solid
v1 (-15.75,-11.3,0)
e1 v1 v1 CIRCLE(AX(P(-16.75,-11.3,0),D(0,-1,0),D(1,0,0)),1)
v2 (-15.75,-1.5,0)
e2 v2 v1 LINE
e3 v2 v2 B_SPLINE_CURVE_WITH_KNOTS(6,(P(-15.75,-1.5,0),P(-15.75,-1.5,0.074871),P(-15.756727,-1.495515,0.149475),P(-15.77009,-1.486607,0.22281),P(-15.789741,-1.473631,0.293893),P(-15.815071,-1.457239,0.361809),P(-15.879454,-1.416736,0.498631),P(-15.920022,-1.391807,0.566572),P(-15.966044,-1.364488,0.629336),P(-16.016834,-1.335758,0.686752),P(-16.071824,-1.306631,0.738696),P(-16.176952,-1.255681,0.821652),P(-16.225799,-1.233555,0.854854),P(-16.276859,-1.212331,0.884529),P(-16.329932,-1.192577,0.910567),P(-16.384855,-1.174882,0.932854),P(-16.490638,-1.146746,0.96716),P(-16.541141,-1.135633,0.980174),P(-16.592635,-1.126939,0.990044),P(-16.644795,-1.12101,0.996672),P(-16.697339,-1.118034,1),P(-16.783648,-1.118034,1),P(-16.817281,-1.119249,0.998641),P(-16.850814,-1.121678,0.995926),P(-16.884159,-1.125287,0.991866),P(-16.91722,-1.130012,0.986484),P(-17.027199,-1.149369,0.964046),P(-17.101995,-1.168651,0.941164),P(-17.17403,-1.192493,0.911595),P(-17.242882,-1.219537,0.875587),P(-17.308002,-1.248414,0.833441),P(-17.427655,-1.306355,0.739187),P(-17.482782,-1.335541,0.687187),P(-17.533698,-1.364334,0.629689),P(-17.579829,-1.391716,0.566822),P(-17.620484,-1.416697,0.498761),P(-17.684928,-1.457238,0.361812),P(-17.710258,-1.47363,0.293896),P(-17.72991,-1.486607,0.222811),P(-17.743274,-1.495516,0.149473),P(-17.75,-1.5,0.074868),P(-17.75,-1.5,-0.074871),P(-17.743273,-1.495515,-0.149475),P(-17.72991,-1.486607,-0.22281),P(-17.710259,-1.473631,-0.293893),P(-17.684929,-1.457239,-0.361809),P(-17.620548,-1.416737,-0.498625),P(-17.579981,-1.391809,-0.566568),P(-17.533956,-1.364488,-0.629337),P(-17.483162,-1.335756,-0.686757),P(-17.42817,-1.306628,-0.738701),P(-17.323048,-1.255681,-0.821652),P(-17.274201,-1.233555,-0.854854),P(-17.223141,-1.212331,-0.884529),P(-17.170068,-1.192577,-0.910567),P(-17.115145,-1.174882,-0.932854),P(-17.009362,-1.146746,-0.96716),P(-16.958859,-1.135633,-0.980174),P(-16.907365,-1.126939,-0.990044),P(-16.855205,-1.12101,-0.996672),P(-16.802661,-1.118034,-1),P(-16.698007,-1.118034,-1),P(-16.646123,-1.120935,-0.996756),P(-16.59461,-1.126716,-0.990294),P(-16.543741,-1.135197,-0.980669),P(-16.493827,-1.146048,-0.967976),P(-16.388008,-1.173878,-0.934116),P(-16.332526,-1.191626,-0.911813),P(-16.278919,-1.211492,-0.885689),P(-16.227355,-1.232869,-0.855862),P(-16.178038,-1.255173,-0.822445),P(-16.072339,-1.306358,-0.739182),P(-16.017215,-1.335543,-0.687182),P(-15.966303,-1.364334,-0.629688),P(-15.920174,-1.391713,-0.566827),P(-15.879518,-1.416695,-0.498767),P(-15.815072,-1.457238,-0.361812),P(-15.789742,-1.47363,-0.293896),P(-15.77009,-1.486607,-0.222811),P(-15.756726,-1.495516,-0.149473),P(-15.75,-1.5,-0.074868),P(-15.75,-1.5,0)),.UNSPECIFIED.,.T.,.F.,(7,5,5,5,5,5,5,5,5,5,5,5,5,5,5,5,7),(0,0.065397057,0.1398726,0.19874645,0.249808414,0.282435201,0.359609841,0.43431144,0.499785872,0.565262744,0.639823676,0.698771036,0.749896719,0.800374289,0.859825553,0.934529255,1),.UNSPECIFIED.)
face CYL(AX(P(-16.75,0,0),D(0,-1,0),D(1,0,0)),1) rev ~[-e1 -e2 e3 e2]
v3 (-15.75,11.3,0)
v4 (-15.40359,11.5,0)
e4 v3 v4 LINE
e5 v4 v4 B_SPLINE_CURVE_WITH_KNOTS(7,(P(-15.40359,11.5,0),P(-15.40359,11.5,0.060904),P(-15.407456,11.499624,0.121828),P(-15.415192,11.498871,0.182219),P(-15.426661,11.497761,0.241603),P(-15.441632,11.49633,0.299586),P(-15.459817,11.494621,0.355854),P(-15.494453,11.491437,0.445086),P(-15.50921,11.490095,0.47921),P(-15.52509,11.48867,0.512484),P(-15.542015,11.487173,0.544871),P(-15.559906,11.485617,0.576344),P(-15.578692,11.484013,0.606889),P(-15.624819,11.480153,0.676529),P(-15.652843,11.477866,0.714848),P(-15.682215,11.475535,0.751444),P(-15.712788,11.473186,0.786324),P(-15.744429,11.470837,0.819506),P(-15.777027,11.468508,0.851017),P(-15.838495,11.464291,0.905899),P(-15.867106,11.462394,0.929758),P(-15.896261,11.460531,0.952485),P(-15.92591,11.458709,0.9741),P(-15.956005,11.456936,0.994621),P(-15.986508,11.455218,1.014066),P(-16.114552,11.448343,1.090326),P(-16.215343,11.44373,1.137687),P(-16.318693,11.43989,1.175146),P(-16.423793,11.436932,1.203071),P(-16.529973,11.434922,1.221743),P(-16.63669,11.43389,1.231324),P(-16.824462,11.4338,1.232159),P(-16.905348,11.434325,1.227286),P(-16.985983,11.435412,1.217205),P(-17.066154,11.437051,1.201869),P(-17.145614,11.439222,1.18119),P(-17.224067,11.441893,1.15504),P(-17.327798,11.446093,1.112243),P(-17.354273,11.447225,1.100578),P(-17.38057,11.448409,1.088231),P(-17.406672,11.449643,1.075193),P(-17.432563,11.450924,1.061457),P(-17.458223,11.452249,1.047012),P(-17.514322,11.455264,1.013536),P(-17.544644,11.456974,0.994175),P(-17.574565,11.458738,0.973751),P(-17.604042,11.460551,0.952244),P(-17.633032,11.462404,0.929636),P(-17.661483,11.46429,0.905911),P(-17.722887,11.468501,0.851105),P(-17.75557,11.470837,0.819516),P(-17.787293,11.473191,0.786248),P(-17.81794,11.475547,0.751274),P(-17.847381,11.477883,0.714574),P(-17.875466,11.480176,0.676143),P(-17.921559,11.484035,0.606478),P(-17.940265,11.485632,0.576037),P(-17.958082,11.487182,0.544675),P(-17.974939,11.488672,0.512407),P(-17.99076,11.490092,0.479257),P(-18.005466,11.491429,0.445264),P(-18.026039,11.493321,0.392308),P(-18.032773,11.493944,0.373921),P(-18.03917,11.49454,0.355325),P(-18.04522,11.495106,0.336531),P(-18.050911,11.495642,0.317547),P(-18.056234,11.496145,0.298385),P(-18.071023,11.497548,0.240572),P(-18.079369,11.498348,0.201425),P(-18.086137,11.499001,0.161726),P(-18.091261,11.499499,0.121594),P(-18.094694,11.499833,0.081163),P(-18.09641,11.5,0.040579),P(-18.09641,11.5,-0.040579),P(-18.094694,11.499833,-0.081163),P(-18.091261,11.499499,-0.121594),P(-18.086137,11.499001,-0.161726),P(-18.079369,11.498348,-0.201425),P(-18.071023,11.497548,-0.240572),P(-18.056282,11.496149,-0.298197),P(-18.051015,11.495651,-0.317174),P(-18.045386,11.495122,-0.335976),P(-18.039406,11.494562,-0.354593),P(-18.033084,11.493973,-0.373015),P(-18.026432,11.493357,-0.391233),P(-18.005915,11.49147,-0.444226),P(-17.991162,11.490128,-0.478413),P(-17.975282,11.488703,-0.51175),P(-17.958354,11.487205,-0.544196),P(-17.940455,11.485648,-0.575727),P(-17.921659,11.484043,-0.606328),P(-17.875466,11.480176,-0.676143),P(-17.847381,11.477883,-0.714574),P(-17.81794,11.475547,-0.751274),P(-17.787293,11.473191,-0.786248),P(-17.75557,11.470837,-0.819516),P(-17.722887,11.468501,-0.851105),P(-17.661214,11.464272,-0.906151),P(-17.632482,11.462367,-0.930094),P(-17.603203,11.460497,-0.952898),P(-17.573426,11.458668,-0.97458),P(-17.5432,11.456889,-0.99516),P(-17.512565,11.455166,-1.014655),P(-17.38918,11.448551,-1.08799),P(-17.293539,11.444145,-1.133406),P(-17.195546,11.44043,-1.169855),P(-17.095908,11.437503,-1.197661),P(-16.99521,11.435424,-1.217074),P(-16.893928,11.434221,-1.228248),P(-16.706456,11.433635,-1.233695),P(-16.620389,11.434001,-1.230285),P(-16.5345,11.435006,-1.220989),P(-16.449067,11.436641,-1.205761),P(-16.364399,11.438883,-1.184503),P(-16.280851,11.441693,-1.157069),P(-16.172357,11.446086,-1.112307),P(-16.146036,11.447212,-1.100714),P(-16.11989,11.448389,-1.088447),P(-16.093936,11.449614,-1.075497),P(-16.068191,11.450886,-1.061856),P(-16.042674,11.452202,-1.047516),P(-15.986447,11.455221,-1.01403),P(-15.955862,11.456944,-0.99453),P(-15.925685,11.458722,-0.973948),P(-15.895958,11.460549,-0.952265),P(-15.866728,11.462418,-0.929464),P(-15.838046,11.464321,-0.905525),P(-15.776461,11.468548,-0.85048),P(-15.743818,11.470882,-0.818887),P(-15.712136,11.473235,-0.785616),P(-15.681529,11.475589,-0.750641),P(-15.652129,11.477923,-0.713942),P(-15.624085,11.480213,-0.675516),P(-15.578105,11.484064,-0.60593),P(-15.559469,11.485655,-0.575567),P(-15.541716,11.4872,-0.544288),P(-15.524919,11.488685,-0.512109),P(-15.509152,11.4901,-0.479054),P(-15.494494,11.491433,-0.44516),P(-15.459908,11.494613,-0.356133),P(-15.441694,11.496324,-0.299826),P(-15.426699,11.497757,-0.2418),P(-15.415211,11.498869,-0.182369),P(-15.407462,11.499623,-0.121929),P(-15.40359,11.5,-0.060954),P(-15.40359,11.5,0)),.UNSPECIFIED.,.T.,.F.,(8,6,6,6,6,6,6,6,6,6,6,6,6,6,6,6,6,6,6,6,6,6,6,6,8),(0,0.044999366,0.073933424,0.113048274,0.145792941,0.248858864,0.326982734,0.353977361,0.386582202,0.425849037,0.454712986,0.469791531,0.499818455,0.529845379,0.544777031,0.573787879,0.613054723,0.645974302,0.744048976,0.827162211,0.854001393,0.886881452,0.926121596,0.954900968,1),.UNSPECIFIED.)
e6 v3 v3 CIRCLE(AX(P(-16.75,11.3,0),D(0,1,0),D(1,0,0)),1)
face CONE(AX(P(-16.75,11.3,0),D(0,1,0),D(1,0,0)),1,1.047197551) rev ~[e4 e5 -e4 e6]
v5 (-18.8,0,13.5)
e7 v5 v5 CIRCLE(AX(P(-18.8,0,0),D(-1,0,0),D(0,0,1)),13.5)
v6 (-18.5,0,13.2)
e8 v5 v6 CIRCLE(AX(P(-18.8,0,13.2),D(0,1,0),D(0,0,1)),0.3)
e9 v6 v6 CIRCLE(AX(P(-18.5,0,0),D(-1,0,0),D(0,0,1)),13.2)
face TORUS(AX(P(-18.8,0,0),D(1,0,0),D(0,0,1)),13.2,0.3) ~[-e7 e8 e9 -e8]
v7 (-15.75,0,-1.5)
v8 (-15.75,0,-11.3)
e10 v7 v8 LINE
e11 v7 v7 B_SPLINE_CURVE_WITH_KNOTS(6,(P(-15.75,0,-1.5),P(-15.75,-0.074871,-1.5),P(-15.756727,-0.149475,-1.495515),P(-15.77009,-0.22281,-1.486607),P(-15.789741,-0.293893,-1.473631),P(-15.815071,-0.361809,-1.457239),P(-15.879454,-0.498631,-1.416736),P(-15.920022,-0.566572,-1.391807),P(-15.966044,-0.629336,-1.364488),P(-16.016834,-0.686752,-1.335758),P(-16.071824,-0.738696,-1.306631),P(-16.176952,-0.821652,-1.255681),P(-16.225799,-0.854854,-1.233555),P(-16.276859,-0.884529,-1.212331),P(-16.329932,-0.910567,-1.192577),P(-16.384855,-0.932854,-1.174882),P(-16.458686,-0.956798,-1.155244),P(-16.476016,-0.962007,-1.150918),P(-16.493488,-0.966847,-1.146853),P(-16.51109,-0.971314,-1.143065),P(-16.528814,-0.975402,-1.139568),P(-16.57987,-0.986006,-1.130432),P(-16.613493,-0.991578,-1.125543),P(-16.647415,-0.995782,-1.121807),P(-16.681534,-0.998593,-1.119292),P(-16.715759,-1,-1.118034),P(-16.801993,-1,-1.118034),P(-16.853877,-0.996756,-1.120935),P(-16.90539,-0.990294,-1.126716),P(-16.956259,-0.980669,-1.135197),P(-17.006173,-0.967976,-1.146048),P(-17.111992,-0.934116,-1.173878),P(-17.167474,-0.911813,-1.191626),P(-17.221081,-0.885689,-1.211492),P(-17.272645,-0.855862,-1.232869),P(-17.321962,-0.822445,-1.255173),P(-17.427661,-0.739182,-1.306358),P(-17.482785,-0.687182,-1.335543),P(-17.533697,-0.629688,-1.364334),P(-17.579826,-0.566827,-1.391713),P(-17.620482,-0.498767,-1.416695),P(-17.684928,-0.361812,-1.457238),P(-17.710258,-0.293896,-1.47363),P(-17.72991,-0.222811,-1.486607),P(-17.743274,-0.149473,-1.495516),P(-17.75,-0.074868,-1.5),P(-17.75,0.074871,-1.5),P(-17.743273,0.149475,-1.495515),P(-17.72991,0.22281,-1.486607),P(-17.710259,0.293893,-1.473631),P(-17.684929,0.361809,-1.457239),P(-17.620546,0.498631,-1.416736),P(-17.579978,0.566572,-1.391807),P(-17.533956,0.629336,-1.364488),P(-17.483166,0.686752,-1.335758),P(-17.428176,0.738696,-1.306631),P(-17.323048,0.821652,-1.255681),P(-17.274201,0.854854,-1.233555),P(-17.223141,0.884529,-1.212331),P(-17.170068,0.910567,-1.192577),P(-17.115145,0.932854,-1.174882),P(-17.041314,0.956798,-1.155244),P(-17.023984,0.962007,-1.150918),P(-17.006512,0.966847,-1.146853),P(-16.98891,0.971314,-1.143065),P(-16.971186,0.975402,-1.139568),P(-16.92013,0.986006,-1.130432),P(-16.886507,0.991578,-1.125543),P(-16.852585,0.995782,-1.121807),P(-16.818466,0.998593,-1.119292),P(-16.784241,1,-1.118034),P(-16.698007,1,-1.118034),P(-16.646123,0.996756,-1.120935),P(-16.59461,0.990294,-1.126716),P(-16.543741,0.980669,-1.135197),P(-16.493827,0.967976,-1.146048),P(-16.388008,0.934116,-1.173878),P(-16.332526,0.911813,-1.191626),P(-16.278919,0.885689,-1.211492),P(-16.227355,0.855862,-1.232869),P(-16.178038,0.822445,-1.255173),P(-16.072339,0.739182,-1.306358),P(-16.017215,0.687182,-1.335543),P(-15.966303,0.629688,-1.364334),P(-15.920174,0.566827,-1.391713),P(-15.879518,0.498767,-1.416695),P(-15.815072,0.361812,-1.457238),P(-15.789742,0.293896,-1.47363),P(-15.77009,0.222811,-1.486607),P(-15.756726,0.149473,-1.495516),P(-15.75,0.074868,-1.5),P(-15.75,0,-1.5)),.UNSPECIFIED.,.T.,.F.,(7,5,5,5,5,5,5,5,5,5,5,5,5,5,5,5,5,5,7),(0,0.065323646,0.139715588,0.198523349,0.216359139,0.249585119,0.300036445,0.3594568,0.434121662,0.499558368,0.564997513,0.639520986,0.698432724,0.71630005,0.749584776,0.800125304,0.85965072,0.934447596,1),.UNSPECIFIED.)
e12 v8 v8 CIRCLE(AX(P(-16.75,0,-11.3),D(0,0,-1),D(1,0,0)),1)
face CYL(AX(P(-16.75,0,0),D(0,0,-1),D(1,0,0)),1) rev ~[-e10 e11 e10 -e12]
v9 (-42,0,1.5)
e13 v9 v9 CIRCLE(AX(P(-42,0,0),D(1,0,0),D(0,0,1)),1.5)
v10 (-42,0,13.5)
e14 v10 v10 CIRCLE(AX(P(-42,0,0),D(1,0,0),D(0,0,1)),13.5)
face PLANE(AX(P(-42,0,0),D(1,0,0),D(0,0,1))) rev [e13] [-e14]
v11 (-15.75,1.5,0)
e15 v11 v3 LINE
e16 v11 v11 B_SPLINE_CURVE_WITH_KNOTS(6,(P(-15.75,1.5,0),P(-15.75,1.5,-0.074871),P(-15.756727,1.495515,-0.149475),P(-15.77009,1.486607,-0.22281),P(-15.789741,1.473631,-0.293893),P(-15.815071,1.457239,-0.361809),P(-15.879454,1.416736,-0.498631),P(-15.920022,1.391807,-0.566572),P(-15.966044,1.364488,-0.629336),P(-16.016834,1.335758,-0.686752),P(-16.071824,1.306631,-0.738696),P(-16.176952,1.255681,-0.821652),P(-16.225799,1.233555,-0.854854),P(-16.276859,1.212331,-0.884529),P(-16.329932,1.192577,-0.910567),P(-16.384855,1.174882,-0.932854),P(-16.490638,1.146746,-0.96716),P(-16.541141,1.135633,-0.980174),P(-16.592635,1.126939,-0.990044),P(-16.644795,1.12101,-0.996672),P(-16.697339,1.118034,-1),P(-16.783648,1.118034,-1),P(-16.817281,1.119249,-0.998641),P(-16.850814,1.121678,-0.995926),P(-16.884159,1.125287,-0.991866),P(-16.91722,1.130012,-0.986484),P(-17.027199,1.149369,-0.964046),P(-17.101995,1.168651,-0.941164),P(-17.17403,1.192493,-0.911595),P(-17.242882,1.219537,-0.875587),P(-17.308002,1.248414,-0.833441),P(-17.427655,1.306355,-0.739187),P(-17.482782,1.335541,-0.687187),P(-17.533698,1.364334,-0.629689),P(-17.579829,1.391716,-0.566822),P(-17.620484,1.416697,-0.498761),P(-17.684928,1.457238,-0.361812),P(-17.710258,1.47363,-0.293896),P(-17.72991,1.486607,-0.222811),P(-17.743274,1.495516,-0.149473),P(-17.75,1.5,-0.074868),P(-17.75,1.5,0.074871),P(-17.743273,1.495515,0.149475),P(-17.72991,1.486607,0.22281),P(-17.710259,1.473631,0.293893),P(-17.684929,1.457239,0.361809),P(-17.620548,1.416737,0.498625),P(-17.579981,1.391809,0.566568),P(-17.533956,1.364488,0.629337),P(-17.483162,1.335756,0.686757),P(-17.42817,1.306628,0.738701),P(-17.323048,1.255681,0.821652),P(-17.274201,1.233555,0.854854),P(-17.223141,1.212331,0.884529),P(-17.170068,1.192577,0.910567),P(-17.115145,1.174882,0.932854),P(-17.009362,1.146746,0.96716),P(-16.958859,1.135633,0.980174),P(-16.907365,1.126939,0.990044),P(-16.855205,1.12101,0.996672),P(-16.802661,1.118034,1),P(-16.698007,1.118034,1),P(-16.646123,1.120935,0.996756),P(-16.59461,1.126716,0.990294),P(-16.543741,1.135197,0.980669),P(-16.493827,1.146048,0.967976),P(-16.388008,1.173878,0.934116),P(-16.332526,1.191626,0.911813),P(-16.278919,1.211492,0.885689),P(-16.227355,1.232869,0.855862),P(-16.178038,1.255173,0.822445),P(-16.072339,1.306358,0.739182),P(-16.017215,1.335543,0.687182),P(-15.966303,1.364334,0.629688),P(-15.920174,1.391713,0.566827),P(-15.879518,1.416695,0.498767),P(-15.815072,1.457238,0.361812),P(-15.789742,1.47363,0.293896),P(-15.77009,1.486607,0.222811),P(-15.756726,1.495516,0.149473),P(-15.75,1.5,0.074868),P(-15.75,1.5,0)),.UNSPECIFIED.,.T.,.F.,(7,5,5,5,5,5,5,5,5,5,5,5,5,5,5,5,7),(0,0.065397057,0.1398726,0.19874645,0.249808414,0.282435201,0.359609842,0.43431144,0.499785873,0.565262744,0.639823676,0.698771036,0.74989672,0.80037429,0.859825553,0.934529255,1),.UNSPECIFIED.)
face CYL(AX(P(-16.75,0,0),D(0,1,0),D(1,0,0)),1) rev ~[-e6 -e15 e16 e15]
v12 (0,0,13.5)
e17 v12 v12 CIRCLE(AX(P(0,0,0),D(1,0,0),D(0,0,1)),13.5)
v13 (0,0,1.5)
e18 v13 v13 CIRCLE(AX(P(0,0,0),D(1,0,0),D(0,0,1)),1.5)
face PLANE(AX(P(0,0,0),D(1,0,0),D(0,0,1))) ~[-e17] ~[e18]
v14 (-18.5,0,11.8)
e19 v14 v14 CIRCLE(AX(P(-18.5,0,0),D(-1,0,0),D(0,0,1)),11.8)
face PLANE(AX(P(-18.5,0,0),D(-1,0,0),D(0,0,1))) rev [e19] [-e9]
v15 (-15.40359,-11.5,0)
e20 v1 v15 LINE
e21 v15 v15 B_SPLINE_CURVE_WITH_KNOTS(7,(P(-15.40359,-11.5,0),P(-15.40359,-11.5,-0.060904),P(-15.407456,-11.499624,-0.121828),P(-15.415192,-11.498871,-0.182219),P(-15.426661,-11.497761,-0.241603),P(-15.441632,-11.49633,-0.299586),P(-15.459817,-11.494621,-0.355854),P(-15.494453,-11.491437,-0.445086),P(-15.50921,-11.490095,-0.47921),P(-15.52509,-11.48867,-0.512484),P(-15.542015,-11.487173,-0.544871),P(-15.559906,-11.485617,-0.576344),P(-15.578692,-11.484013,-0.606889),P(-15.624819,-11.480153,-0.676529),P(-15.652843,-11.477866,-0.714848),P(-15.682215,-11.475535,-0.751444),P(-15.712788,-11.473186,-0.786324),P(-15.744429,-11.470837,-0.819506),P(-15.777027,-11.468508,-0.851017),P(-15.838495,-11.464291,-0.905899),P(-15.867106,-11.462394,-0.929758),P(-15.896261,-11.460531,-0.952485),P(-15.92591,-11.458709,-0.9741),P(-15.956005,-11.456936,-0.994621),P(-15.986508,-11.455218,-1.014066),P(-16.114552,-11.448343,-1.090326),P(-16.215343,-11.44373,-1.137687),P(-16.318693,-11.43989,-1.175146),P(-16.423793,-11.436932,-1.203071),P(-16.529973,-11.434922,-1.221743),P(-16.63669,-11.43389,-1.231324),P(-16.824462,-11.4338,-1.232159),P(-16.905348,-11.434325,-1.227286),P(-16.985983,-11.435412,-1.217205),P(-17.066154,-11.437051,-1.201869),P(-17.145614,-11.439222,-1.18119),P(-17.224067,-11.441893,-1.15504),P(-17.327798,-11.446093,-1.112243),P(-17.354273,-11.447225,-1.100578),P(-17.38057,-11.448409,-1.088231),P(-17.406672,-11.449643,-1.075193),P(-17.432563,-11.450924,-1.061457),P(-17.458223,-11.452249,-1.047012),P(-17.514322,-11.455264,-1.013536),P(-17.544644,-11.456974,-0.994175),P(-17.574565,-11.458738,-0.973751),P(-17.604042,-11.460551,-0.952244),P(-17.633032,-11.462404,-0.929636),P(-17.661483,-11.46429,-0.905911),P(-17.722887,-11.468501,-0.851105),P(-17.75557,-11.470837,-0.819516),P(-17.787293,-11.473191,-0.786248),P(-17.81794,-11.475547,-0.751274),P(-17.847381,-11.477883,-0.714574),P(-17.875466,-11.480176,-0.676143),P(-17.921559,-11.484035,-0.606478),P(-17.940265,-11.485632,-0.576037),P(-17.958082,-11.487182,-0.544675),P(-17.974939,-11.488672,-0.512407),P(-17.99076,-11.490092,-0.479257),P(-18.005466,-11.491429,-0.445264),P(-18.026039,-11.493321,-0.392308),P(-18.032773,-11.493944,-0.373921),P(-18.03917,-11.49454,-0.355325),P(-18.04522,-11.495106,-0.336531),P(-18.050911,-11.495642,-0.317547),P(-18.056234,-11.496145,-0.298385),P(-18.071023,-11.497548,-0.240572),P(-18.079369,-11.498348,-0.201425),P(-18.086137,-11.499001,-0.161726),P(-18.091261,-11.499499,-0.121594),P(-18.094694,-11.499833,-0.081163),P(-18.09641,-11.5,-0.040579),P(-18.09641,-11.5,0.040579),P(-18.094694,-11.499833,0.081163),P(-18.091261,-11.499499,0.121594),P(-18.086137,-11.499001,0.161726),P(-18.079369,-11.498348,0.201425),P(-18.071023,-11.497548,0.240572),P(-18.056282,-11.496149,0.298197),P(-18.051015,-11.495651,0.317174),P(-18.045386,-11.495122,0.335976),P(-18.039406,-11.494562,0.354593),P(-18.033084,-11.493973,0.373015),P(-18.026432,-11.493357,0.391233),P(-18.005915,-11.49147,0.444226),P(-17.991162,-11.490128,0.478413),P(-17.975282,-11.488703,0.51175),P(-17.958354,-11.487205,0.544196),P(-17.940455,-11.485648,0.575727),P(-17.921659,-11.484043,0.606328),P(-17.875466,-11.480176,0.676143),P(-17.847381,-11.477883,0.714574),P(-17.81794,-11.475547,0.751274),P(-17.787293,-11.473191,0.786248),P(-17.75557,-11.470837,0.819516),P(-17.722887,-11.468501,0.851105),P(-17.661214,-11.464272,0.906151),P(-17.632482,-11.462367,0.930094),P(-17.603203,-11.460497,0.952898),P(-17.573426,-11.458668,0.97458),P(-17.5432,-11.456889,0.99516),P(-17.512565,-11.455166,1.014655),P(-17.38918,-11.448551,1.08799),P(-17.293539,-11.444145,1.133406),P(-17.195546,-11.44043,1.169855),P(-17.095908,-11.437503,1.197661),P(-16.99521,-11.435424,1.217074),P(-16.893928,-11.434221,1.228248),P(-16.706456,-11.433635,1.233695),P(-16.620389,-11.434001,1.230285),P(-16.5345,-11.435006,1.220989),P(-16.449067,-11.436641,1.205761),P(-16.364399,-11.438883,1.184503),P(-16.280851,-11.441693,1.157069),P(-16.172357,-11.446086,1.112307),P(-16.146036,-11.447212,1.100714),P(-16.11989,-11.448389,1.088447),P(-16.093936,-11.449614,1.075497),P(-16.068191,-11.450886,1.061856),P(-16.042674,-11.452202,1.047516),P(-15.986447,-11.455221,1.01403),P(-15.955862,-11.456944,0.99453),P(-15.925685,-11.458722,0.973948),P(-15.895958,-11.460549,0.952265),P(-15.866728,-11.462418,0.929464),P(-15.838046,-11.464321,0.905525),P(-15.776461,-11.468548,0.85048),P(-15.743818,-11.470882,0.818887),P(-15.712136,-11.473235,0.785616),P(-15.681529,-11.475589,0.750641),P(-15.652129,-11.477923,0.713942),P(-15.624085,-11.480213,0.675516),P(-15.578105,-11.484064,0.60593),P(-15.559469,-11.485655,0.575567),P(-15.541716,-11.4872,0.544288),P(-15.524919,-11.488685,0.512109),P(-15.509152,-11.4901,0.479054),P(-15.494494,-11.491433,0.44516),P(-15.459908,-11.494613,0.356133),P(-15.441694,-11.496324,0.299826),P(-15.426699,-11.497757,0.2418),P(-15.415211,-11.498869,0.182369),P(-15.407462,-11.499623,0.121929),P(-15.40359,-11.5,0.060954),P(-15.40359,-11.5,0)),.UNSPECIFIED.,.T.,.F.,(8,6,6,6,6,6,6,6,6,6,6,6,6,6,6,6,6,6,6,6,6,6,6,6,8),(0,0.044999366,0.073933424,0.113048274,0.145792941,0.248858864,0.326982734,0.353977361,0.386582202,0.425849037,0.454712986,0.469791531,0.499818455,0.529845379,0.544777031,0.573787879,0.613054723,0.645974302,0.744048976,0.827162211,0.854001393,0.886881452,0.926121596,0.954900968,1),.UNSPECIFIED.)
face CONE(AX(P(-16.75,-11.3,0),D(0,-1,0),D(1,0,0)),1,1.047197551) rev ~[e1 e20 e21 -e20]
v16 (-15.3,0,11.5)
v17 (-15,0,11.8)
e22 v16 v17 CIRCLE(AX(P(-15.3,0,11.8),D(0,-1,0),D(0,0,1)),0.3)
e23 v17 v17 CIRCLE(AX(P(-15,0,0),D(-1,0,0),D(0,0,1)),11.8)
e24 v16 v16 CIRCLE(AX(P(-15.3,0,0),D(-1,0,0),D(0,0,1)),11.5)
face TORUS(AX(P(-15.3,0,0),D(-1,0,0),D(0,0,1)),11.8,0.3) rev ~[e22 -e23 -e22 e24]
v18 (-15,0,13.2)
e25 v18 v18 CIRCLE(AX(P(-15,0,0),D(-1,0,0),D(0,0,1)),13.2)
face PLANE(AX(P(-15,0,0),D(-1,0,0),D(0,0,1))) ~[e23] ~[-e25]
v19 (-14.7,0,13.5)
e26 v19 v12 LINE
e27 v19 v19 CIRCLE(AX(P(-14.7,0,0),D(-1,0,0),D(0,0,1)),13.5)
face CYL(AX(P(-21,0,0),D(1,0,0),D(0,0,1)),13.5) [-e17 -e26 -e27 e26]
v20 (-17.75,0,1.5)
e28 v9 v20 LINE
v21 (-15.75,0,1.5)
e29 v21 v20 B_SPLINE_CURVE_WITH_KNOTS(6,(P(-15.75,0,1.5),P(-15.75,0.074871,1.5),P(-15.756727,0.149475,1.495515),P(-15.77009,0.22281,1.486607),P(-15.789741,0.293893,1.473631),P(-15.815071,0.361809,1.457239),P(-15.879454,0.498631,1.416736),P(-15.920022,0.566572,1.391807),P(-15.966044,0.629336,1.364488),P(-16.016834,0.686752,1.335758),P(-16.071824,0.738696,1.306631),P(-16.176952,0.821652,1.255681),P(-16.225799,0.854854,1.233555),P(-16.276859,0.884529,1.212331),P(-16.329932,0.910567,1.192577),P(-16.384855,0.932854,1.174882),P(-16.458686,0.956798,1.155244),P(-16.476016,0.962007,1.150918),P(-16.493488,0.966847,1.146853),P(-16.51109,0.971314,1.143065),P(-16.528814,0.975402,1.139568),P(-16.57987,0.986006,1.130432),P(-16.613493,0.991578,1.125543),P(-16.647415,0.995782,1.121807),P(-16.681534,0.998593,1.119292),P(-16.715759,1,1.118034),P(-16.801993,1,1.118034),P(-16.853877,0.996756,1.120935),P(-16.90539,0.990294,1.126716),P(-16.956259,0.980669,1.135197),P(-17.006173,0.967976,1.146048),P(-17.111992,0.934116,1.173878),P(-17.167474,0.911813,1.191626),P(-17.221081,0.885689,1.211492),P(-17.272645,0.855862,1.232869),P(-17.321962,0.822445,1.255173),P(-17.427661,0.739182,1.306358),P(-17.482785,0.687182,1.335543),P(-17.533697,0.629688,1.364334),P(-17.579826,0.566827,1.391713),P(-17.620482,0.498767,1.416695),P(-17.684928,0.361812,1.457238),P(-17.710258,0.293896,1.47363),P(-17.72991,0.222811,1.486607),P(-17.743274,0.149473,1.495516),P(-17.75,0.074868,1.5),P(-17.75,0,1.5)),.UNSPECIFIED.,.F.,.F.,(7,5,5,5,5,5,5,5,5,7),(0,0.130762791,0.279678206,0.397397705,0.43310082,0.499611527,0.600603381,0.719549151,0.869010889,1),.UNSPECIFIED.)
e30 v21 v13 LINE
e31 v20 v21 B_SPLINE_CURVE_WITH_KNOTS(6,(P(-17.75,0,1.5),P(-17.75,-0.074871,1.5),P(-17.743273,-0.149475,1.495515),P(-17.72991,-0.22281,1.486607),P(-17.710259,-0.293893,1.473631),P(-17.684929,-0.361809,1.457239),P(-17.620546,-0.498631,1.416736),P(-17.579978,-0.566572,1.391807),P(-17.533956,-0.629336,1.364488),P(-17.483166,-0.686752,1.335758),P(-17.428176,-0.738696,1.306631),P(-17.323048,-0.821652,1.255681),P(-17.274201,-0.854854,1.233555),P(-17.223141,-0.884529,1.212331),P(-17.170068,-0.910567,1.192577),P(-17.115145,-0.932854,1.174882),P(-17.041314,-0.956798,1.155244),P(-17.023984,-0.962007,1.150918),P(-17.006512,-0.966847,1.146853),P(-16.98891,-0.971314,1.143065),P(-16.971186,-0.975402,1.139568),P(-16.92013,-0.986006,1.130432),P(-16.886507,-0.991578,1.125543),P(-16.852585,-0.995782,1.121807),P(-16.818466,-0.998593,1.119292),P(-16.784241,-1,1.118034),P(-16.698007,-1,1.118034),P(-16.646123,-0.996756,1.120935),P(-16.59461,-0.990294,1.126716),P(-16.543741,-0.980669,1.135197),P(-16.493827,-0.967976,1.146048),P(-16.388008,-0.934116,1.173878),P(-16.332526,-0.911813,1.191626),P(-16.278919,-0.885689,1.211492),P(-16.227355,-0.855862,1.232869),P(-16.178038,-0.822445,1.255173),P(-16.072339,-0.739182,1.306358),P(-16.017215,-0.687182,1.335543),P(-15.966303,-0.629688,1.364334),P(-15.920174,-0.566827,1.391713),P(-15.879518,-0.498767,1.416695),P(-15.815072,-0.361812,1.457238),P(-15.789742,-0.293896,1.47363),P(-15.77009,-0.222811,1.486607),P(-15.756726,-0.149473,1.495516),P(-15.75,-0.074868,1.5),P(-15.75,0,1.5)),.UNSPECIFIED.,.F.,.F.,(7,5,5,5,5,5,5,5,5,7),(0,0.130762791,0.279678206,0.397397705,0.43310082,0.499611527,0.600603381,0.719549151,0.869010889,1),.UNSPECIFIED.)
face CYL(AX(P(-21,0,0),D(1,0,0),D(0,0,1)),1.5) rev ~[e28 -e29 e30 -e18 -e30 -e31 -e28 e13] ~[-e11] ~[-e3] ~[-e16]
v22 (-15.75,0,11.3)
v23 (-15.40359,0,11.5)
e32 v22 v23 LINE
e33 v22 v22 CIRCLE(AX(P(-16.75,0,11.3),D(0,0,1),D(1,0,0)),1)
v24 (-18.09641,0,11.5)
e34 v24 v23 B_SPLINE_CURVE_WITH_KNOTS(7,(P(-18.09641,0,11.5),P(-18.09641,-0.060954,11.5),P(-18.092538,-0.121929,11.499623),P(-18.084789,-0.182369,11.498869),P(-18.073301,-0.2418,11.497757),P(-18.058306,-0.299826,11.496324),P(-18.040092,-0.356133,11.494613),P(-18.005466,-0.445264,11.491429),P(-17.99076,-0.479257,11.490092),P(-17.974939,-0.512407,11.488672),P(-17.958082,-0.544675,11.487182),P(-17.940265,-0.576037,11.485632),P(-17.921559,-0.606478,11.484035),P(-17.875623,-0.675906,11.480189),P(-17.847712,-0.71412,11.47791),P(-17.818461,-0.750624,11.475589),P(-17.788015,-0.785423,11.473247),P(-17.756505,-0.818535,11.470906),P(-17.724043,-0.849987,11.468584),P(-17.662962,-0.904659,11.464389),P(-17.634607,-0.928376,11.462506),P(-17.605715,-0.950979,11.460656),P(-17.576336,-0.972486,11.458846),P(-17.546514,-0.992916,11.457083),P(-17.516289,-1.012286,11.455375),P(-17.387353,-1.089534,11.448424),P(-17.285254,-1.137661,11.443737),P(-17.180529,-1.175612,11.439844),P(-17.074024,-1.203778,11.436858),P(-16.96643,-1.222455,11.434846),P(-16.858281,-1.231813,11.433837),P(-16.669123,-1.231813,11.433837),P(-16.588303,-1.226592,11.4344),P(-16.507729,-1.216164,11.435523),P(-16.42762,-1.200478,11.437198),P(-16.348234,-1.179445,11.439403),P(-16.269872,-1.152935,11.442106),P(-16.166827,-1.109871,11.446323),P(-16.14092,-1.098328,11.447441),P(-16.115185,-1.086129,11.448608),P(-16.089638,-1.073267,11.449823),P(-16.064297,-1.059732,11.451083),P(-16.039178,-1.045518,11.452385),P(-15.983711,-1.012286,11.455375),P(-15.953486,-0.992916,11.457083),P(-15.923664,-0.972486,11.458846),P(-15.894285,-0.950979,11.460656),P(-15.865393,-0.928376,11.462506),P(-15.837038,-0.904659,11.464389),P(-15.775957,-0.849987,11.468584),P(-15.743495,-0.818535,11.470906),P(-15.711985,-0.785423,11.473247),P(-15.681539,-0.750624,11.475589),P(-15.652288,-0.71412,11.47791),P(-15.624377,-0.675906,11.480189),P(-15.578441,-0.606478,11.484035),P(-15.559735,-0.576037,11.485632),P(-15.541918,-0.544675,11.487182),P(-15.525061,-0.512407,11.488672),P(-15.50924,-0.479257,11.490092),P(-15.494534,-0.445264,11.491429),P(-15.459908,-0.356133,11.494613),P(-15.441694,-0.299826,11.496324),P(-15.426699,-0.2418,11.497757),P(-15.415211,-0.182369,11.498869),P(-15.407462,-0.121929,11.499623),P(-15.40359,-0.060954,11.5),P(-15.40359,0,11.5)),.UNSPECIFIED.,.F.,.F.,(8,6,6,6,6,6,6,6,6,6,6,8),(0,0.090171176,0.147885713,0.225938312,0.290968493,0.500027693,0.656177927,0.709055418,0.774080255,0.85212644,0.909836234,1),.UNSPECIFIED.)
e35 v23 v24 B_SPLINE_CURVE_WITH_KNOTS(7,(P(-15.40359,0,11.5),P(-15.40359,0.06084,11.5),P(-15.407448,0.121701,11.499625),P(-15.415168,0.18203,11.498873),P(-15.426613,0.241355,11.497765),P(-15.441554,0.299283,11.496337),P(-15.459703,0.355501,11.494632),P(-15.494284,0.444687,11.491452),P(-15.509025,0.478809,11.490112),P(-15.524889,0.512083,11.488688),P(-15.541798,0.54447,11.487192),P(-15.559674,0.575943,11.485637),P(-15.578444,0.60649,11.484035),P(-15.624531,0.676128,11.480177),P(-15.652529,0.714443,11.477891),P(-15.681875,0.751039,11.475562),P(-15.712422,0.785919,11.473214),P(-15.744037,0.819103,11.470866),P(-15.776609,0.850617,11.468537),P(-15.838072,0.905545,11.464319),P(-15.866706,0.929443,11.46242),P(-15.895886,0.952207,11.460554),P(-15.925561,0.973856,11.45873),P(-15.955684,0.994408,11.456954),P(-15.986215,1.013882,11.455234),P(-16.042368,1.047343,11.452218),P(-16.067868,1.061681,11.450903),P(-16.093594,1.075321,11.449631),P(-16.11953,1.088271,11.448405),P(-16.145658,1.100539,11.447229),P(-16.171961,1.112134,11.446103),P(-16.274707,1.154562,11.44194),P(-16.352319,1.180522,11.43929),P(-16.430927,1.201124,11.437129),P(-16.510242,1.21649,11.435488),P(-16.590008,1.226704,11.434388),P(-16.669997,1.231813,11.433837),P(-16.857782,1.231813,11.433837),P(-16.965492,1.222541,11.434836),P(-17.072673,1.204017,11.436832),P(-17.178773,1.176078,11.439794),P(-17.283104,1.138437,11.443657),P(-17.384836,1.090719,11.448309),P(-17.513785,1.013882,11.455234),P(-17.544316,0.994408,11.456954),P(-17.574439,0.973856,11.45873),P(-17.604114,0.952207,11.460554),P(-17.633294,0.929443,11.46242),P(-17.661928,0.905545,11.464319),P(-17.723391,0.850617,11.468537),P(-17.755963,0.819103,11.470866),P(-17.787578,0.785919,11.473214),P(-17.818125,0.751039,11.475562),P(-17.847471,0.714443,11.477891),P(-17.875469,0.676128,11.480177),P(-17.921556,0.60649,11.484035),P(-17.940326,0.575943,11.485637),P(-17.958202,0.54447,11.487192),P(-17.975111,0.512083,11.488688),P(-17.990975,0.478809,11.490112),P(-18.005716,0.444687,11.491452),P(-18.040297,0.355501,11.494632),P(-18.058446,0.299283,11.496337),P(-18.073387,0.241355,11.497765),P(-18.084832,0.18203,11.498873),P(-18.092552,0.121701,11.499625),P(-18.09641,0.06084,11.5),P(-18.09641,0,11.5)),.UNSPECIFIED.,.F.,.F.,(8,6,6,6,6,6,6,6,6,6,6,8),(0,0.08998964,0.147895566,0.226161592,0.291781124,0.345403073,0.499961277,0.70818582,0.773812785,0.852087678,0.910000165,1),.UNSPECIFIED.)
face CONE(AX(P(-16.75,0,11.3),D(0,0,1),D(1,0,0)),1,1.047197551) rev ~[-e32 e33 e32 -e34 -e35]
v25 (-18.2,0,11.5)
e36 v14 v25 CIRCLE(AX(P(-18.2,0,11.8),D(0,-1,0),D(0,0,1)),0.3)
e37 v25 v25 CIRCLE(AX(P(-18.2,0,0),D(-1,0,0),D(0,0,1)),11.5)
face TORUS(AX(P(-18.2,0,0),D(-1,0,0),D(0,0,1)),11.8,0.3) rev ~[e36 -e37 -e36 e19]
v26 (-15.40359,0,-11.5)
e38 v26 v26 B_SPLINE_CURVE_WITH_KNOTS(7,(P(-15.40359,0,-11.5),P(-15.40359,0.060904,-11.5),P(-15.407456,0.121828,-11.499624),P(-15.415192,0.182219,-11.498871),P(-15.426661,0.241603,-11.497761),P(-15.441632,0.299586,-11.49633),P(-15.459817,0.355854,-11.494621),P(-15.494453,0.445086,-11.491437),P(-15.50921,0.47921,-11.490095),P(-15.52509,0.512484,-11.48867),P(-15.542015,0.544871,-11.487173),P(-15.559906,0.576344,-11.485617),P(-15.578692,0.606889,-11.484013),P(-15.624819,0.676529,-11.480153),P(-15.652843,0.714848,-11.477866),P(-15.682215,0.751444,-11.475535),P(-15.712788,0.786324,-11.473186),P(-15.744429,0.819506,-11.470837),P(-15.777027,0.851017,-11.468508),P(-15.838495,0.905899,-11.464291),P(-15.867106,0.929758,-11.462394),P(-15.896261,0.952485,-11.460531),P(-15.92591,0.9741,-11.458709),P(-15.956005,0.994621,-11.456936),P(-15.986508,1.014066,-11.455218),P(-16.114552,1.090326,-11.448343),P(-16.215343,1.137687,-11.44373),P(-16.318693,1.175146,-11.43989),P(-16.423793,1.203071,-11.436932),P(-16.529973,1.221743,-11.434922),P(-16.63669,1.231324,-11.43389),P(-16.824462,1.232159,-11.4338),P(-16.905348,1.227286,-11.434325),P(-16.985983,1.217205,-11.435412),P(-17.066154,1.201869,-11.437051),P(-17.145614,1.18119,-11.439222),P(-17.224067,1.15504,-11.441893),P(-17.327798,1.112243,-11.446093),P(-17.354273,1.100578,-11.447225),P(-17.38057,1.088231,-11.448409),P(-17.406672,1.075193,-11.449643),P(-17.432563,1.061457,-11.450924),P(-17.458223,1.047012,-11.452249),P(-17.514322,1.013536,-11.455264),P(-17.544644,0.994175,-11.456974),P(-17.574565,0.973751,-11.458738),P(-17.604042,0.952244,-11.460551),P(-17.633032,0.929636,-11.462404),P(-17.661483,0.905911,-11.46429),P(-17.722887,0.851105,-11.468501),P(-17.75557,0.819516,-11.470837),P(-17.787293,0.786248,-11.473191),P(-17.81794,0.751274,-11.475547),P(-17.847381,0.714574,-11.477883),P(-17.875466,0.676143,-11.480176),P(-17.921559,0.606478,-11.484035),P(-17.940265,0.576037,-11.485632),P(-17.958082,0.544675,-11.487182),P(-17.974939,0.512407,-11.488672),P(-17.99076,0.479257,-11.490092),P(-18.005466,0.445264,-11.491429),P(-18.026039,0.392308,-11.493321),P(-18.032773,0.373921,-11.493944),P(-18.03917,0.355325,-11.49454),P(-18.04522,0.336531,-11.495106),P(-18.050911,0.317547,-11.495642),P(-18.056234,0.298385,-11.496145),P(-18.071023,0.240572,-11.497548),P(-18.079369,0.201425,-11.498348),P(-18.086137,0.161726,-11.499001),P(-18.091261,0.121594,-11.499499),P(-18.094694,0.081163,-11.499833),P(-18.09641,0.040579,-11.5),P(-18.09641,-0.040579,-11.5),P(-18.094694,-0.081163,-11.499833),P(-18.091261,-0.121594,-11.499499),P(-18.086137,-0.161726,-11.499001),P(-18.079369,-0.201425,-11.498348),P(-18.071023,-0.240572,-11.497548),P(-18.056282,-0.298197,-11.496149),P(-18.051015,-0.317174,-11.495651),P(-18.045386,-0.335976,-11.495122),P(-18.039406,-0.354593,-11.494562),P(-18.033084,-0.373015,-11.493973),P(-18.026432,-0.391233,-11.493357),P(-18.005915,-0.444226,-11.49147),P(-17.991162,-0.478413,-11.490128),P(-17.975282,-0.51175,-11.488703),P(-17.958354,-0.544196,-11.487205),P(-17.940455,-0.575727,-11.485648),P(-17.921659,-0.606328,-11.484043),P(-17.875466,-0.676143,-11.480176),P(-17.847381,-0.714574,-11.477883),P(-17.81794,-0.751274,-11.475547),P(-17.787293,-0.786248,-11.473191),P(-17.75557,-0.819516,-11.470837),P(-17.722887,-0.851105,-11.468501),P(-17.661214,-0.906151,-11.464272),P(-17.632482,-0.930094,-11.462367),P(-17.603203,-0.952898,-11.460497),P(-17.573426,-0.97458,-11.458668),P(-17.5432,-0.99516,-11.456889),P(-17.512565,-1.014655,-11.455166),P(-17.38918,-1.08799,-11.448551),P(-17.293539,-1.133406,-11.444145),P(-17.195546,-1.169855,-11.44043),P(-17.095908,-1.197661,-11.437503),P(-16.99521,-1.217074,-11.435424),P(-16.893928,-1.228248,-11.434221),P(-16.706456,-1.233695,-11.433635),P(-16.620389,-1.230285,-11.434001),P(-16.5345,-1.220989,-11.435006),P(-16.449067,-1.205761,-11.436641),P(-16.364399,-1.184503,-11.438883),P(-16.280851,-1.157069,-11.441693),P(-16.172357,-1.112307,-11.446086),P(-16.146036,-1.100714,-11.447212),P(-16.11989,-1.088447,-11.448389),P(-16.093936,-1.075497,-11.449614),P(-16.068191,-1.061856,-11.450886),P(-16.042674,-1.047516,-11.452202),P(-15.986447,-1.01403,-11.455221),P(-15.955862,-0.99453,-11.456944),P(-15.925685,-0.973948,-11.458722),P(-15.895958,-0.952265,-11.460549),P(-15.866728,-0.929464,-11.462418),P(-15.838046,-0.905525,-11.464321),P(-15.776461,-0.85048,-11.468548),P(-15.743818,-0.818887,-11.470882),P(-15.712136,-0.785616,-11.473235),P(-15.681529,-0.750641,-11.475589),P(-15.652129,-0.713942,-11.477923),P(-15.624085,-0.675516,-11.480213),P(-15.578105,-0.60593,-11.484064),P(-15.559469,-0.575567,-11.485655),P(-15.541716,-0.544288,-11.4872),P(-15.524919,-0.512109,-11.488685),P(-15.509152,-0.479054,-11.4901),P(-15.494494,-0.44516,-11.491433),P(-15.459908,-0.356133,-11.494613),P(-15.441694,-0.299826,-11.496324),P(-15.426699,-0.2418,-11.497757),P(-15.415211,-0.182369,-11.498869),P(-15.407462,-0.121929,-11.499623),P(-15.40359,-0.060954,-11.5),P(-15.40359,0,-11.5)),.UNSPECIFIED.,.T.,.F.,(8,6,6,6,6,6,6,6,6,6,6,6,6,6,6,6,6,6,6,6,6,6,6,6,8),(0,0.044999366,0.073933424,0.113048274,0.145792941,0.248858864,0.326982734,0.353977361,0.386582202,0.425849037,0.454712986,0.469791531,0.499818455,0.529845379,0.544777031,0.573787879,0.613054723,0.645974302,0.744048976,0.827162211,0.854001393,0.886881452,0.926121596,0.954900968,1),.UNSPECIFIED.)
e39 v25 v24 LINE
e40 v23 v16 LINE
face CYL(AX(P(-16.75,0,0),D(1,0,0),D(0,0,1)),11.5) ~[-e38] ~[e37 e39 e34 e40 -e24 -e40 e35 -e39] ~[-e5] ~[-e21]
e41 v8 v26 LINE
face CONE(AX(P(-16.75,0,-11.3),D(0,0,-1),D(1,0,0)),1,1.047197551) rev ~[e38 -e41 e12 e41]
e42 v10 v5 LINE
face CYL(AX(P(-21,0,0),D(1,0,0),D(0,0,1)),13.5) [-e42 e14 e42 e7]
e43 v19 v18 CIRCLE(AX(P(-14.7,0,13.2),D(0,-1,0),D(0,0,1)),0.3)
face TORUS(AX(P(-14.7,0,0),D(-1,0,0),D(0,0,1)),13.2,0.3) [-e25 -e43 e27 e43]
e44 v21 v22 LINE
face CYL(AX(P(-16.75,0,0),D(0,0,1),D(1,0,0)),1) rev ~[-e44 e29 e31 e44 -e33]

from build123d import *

# Parameters (mm, degrees)
F0_W            = 42
F0_H            = 12
F2_W            = 3.5
F2_H            = 2
F4_R            = 0.3
F6_COPIES_COUNT = 4


# Not quite as in the source:
# - a pattern or mirror of a feature is missing from the dataset's text; its kind, count and spacing are read off the source's solid


with BuildPart() as f1:
    # F0 (on Front) → F1 (revolve)
    with BuildSketch(Plane.XZ):
        with Locations((-21, 7.5)):
            Rectangle(F0_W, F0_H)
    revolve(axis=Axis((-10.2689703926, 0, 0), (1, 0, 0)))

    # F2 (on face) → F3 (revolve, cut)
    with BuildSketch(Plane.XZ):
        with Locations((-16.75, 12.5)):
            Rectangle(F2_W, F2_H)
    revolve(axis=Axis((-21, 0, 0), (-1, 0, 0)), mode=Mode.SUBTRACT)

    # F4
    f4_edges = [f1.edges().sort_by_distance(p)[0] for p in [
        (-18.5, 0, -13.5),
        (-15, 0, -13.5),
        (-18.5, 0, -11.5),
        (-15, 0, -11.5),
    ]]
    fillet(f4_edges, radius=F4_R)

    # F5 (on face) → F6 (revolve, cut)
    with BuildSketch(Plane.XZ):
        Polygon((-15.4035898385, 11.5), (-16.75, 11.5), (-16.75, 0), (-15.75, 0), (-15.75, 11.3), align=None)
    f6 = revolve(axis=Axis((-16.75, 0, 5.75), (0, 0, 1)), mode=Mode.SUBTRACT)

    # F6_copies: F6 ×4 about axis
    f6_copies_axis = Axis((0, 0, 0), (1, 0, 0))
    for i in range(1, F6_COPIES_COUNT):
        add(f6.rotate(f6_copies_axis, i * 360 / F6_COPIES_COUNT), mode=Mode.SUBTRACT)


solid = f1.part
